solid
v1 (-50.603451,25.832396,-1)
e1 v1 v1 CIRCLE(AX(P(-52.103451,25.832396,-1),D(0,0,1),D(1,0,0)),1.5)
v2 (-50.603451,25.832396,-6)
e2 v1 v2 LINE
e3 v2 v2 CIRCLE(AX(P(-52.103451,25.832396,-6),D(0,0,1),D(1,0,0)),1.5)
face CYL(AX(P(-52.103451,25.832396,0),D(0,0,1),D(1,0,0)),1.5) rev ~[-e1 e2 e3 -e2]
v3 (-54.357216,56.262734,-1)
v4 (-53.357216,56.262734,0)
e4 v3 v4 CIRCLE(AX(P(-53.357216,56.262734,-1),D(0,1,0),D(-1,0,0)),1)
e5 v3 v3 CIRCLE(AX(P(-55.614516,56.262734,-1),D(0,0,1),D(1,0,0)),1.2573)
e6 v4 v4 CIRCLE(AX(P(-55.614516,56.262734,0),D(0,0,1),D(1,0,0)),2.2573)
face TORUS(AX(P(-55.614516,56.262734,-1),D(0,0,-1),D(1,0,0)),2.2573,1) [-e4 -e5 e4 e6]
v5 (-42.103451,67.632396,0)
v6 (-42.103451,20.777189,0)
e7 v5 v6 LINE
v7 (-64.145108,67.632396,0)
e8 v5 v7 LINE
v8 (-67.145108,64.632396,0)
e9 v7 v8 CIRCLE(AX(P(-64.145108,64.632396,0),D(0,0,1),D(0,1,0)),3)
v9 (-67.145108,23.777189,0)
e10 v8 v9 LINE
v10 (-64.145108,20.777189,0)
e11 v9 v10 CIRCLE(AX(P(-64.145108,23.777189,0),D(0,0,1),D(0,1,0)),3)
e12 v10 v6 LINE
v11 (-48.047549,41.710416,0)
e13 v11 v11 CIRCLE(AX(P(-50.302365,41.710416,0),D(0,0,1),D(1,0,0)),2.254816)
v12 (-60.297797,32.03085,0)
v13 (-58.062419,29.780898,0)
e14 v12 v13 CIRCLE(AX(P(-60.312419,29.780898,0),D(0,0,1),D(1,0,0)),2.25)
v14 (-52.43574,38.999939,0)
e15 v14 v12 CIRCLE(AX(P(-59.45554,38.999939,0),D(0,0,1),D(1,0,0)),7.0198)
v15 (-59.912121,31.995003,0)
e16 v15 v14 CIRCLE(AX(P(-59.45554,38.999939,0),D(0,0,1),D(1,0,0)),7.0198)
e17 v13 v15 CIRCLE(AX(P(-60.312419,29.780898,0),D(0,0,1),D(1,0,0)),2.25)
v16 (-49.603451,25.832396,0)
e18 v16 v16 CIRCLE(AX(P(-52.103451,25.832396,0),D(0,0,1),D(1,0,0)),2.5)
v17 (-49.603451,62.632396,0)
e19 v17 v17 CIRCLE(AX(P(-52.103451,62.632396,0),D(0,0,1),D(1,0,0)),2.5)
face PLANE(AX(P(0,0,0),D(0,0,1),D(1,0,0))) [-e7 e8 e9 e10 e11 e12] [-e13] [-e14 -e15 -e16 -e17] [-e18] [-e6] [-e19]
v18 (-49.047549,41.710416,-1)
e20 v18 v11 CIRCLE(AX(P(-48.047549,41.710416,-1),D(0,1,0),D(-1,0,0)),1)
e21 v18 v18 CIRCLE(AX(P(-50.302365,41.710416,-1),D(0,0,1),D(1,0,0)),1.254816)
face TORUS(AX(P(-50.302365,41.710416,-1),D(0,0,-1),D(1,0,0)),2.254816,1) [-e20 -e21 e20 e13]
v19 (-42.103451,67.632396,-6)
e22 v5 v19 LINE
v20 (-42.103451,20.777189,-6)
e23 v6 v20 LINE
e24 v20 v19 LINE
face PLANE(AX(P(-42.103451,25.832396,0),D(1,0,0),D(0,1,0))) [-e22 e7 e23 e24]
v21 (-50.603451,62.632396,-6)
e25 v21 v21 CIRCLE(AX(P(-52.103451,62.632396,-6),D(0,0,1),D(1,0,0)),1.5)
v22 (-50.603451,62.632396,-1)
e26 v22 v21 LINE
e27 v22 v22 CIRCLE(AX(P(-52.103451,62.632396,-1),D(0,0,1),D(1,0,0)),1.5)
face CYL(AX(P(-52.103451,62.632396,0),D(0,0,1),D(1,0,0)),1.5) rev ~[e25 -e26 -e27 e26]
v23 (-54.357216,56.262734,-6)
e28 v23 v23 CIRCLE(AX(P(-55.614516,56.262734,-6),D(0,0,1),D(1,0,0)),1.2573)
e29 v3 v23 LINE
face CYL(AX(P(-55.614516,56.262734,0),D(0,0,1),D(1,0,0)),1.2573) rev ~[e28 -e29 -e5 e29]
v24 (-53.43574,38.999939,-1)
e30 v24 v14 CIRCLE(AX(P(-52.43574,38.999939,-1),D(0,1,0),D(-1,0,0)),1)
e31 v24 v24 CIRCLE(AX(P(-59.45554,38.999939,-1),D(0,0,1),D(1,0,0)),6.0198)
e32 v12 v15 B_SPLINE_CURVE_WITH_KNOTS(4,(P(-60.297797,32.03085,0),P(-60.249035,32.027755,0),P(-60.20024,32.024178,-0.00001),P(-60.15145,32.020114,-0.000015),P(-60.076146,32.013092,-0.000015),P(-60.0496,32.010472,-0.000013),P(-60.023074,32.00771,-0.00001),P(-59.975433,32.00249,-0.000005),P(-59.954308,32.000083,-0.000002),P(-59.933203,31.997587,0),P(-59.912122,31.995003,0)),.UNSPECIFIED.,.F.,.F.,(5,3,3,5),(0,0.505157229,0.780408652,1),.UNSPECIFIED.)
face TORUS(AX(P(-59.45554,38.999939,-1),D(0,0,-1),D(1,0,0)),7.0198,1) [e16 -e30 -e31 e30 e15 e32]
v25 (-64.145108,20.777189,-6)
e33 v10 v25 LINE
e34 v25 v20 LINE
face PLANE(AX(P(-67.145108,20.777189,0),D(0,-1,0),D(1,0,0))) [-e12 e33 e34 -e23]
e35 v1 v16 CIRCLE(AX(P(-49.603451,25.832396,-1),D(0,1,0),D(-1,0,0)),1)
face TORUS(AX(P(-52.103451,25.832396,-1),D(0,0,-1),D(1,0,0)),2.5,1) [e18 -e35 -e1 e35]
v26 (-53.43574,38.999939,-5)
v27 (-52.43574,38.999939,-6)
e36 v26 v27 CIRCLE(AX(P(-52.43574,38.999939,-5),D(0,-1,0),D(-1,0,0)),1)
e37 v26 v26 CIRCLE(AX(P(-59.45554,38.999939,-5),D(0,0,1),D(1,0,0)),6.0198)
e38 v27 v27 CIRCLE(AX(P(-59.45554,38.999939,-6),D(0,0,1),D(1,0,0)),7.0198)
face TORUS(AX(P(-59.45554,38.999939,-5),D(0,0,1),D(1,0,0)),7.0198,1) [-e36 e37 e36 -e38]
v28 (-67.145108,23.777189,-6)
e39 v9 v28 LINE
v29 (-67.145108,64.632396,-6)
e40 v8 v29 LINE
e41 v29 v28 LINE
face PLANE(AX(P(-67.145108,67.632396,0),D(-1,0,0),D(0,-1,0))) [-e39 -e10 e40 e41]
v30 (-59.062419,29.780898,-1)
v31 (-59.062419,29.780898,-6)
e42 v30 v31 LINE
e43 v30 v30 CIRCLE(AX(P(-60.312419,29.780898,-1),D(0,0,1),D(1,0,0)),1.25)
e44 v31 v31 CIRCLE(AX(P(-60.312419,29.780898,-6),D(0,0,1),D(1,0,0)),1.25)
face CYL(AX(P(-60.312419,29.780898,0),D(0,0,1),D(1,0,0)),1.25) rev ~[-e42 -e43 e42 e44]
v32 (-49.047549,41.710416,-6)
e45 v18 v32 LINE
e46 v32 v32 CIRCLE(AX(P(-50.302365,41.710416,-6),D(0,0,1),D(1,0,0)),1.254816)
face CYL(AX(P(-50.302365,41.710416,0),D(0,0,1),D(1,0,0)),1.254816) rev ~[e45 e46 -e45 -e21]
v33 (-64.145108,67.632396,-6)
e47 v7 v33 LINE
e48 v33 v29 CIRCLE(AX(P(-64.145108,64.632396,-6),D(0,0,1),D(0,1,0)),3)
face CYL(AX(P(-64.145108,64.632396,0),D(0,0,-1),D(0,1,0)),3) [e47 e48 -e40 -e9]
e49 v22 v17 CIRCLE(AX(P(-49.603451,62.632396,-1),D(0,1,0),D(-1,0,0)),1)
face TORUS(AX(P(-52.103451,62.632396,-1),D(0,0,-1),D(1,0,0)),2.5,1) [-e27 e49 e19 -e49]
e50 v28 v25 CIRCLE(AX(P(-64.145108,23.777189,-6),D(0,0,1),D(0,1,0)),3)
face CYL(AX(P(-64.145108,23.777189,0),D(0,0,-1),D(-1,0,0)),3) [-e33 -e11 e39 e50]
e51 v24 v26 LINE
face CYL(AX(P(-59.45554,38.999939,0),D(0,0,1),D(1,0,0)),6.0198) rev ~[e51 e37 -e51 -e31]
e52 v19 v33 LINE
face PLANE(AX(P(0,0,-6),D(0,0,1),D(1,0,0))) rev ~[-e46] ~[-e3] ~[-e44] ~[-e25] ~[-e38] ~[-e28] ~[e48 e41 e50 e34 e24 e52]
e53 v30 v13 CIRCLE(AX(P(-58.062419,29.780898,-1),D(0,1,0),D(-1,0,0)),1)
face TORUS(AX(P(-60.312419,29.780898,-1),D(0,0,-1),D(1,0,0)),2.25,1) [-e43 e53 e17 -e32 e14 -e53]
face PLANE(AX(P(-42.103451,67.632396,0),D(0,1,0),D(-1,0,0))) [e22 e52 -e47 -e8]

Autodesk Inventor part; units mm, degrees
ref_plane "YZ Plane" through (0, 0, 0) normal (1, 0, 0) x (0, 1, 0)
ref_plane "XZ Plane" through (0, 0, 0) normal (0, 1, 0) x (-1, 0, 0)
ref_plane "XY Plane" through (0, 0, 0) normal (0, 0, 1) x (1, 0, 0)
sketch "Sketch1" plane through (0, 0, 0) normal (0, 0, 1) x (1, 0, 0)
  line L0 (-42.103451, 25.832396) -> (-42.103451, 67.632396)
  line L1 (-42.103451, 67.632396) -> (-67.145108, 67.632396)
  line L2 (-67.145108, 67.632396) -> (-67.145108, 20.777189)
  line L3 (-67.145108, 20.777189) -> (-42.103451, 20.777189)
  line L4 (-42.103451, 20.777189) -> (-42.103451, 67.632396)
  line L5 (-42.103451, 67.632396) -> (-64.103451, 67.632396)
  line L6 (-42.103451, 67.632396) -> (-42.103451, 62.632396)
  line L7 (-42.103451, 36.232396) -> (-42.103451, 20.832396)
  line L8 (-42.103451, 20.832396) -> (-42.103451, 25.832396)
  circle A0 centre (-52.103451, 62.632396) radius 1.5
  circle A1 centre (-52.103451, 25.832396) radius 1.5
  arc A2 (-67.103451, 26.001195) -> (-67.103451, 62.678375) centre (-65.601409, 44.339785) ccw
  circle A3 centre (-65.613731, 44.346133) radius 18.4
  circle A4 centre (-75.593787, 32.452366) radius 0.975975
  circle A5 centre (-60.312419, 29.780898) radius 1.25
  circle A6 centre (-60.312419, 29.780898) radius 1.25
  circle A7 centre (-75.593787, 32.452366) radius 0.975975
  circle A8 centre (-80.878251, 47.03768) radius 1.25
  circle A9 centre (-80.878251, 47.03768) radius 1.25
  circle A10 centre (-70.868197, 58.967198) radius 1.013606
  circle A11 centre (-50.302365, 41.710416) radius 1.254816
  circle A12 centre (-59.45554, 38.999939) radius 6.0198
  circle A13 centre (-55.614516, 56.262734) radius 1.2573
  point P0 (0, 0)
  point P1 (-62.028451, 25.832396)
  point P2 (-78.421274, 29.082698)
sketch "Sketch1 outline for Extrusion1" plane through (0, 0, 0) normal (0, 0, 1) x (1, 0, 0)
  line L0 (-67.145108, 67.632396) -> (-67.145108, 20.777189)
  line L1 (-42.103451, 67.632396) -> (-67.145108, 67.632396)
  line L2 (-67.145108, 20.777189) -> (-42.103451, 20.777189)
  line L3 (-42.103451, 25.832396) -> (-42.103451, 67.632396)
  line L4 (-42.103451, 20.777189) -> (-42.103451, 25.832396)
  circle A0 centre (-60.312419, 29.780898) radius 1.25
  circle A1 centre (-59.45554, 38.999939) radius 6.0198
  circle A2 centre (-52.103451, 25.832396) radius 1.5
  circle A3 centre (-50.302365, 41.710416) radius 1.254816
  circle A4 centre (-55.614516, 56.262734) radius 1.2573
  circle A5 centre (-52.103451, 62.632396) radius 1.5
extrude "Extrusion1" add sketch "Sketch1 outline for Extrusion1" against normal blind 6
fillet "Fillet1" radius 1 7 edges at (-53.6035, 62.6324, 0) (-56.8718, 56.2627, 0) (-51.5572, 41.7104, 0) (-53.6035, 25.8324, 0) (-61.5624, 29.7809, 0) (-65.4753, 38.9999, -6) (-65.4753, 38.9999, 0)
fillet "Fillet2" radius 3 2 edges at (-67.1451, 67.6324, -3) (-67.1451, 20.7772, -3)
properties part number "Tapa motor"
